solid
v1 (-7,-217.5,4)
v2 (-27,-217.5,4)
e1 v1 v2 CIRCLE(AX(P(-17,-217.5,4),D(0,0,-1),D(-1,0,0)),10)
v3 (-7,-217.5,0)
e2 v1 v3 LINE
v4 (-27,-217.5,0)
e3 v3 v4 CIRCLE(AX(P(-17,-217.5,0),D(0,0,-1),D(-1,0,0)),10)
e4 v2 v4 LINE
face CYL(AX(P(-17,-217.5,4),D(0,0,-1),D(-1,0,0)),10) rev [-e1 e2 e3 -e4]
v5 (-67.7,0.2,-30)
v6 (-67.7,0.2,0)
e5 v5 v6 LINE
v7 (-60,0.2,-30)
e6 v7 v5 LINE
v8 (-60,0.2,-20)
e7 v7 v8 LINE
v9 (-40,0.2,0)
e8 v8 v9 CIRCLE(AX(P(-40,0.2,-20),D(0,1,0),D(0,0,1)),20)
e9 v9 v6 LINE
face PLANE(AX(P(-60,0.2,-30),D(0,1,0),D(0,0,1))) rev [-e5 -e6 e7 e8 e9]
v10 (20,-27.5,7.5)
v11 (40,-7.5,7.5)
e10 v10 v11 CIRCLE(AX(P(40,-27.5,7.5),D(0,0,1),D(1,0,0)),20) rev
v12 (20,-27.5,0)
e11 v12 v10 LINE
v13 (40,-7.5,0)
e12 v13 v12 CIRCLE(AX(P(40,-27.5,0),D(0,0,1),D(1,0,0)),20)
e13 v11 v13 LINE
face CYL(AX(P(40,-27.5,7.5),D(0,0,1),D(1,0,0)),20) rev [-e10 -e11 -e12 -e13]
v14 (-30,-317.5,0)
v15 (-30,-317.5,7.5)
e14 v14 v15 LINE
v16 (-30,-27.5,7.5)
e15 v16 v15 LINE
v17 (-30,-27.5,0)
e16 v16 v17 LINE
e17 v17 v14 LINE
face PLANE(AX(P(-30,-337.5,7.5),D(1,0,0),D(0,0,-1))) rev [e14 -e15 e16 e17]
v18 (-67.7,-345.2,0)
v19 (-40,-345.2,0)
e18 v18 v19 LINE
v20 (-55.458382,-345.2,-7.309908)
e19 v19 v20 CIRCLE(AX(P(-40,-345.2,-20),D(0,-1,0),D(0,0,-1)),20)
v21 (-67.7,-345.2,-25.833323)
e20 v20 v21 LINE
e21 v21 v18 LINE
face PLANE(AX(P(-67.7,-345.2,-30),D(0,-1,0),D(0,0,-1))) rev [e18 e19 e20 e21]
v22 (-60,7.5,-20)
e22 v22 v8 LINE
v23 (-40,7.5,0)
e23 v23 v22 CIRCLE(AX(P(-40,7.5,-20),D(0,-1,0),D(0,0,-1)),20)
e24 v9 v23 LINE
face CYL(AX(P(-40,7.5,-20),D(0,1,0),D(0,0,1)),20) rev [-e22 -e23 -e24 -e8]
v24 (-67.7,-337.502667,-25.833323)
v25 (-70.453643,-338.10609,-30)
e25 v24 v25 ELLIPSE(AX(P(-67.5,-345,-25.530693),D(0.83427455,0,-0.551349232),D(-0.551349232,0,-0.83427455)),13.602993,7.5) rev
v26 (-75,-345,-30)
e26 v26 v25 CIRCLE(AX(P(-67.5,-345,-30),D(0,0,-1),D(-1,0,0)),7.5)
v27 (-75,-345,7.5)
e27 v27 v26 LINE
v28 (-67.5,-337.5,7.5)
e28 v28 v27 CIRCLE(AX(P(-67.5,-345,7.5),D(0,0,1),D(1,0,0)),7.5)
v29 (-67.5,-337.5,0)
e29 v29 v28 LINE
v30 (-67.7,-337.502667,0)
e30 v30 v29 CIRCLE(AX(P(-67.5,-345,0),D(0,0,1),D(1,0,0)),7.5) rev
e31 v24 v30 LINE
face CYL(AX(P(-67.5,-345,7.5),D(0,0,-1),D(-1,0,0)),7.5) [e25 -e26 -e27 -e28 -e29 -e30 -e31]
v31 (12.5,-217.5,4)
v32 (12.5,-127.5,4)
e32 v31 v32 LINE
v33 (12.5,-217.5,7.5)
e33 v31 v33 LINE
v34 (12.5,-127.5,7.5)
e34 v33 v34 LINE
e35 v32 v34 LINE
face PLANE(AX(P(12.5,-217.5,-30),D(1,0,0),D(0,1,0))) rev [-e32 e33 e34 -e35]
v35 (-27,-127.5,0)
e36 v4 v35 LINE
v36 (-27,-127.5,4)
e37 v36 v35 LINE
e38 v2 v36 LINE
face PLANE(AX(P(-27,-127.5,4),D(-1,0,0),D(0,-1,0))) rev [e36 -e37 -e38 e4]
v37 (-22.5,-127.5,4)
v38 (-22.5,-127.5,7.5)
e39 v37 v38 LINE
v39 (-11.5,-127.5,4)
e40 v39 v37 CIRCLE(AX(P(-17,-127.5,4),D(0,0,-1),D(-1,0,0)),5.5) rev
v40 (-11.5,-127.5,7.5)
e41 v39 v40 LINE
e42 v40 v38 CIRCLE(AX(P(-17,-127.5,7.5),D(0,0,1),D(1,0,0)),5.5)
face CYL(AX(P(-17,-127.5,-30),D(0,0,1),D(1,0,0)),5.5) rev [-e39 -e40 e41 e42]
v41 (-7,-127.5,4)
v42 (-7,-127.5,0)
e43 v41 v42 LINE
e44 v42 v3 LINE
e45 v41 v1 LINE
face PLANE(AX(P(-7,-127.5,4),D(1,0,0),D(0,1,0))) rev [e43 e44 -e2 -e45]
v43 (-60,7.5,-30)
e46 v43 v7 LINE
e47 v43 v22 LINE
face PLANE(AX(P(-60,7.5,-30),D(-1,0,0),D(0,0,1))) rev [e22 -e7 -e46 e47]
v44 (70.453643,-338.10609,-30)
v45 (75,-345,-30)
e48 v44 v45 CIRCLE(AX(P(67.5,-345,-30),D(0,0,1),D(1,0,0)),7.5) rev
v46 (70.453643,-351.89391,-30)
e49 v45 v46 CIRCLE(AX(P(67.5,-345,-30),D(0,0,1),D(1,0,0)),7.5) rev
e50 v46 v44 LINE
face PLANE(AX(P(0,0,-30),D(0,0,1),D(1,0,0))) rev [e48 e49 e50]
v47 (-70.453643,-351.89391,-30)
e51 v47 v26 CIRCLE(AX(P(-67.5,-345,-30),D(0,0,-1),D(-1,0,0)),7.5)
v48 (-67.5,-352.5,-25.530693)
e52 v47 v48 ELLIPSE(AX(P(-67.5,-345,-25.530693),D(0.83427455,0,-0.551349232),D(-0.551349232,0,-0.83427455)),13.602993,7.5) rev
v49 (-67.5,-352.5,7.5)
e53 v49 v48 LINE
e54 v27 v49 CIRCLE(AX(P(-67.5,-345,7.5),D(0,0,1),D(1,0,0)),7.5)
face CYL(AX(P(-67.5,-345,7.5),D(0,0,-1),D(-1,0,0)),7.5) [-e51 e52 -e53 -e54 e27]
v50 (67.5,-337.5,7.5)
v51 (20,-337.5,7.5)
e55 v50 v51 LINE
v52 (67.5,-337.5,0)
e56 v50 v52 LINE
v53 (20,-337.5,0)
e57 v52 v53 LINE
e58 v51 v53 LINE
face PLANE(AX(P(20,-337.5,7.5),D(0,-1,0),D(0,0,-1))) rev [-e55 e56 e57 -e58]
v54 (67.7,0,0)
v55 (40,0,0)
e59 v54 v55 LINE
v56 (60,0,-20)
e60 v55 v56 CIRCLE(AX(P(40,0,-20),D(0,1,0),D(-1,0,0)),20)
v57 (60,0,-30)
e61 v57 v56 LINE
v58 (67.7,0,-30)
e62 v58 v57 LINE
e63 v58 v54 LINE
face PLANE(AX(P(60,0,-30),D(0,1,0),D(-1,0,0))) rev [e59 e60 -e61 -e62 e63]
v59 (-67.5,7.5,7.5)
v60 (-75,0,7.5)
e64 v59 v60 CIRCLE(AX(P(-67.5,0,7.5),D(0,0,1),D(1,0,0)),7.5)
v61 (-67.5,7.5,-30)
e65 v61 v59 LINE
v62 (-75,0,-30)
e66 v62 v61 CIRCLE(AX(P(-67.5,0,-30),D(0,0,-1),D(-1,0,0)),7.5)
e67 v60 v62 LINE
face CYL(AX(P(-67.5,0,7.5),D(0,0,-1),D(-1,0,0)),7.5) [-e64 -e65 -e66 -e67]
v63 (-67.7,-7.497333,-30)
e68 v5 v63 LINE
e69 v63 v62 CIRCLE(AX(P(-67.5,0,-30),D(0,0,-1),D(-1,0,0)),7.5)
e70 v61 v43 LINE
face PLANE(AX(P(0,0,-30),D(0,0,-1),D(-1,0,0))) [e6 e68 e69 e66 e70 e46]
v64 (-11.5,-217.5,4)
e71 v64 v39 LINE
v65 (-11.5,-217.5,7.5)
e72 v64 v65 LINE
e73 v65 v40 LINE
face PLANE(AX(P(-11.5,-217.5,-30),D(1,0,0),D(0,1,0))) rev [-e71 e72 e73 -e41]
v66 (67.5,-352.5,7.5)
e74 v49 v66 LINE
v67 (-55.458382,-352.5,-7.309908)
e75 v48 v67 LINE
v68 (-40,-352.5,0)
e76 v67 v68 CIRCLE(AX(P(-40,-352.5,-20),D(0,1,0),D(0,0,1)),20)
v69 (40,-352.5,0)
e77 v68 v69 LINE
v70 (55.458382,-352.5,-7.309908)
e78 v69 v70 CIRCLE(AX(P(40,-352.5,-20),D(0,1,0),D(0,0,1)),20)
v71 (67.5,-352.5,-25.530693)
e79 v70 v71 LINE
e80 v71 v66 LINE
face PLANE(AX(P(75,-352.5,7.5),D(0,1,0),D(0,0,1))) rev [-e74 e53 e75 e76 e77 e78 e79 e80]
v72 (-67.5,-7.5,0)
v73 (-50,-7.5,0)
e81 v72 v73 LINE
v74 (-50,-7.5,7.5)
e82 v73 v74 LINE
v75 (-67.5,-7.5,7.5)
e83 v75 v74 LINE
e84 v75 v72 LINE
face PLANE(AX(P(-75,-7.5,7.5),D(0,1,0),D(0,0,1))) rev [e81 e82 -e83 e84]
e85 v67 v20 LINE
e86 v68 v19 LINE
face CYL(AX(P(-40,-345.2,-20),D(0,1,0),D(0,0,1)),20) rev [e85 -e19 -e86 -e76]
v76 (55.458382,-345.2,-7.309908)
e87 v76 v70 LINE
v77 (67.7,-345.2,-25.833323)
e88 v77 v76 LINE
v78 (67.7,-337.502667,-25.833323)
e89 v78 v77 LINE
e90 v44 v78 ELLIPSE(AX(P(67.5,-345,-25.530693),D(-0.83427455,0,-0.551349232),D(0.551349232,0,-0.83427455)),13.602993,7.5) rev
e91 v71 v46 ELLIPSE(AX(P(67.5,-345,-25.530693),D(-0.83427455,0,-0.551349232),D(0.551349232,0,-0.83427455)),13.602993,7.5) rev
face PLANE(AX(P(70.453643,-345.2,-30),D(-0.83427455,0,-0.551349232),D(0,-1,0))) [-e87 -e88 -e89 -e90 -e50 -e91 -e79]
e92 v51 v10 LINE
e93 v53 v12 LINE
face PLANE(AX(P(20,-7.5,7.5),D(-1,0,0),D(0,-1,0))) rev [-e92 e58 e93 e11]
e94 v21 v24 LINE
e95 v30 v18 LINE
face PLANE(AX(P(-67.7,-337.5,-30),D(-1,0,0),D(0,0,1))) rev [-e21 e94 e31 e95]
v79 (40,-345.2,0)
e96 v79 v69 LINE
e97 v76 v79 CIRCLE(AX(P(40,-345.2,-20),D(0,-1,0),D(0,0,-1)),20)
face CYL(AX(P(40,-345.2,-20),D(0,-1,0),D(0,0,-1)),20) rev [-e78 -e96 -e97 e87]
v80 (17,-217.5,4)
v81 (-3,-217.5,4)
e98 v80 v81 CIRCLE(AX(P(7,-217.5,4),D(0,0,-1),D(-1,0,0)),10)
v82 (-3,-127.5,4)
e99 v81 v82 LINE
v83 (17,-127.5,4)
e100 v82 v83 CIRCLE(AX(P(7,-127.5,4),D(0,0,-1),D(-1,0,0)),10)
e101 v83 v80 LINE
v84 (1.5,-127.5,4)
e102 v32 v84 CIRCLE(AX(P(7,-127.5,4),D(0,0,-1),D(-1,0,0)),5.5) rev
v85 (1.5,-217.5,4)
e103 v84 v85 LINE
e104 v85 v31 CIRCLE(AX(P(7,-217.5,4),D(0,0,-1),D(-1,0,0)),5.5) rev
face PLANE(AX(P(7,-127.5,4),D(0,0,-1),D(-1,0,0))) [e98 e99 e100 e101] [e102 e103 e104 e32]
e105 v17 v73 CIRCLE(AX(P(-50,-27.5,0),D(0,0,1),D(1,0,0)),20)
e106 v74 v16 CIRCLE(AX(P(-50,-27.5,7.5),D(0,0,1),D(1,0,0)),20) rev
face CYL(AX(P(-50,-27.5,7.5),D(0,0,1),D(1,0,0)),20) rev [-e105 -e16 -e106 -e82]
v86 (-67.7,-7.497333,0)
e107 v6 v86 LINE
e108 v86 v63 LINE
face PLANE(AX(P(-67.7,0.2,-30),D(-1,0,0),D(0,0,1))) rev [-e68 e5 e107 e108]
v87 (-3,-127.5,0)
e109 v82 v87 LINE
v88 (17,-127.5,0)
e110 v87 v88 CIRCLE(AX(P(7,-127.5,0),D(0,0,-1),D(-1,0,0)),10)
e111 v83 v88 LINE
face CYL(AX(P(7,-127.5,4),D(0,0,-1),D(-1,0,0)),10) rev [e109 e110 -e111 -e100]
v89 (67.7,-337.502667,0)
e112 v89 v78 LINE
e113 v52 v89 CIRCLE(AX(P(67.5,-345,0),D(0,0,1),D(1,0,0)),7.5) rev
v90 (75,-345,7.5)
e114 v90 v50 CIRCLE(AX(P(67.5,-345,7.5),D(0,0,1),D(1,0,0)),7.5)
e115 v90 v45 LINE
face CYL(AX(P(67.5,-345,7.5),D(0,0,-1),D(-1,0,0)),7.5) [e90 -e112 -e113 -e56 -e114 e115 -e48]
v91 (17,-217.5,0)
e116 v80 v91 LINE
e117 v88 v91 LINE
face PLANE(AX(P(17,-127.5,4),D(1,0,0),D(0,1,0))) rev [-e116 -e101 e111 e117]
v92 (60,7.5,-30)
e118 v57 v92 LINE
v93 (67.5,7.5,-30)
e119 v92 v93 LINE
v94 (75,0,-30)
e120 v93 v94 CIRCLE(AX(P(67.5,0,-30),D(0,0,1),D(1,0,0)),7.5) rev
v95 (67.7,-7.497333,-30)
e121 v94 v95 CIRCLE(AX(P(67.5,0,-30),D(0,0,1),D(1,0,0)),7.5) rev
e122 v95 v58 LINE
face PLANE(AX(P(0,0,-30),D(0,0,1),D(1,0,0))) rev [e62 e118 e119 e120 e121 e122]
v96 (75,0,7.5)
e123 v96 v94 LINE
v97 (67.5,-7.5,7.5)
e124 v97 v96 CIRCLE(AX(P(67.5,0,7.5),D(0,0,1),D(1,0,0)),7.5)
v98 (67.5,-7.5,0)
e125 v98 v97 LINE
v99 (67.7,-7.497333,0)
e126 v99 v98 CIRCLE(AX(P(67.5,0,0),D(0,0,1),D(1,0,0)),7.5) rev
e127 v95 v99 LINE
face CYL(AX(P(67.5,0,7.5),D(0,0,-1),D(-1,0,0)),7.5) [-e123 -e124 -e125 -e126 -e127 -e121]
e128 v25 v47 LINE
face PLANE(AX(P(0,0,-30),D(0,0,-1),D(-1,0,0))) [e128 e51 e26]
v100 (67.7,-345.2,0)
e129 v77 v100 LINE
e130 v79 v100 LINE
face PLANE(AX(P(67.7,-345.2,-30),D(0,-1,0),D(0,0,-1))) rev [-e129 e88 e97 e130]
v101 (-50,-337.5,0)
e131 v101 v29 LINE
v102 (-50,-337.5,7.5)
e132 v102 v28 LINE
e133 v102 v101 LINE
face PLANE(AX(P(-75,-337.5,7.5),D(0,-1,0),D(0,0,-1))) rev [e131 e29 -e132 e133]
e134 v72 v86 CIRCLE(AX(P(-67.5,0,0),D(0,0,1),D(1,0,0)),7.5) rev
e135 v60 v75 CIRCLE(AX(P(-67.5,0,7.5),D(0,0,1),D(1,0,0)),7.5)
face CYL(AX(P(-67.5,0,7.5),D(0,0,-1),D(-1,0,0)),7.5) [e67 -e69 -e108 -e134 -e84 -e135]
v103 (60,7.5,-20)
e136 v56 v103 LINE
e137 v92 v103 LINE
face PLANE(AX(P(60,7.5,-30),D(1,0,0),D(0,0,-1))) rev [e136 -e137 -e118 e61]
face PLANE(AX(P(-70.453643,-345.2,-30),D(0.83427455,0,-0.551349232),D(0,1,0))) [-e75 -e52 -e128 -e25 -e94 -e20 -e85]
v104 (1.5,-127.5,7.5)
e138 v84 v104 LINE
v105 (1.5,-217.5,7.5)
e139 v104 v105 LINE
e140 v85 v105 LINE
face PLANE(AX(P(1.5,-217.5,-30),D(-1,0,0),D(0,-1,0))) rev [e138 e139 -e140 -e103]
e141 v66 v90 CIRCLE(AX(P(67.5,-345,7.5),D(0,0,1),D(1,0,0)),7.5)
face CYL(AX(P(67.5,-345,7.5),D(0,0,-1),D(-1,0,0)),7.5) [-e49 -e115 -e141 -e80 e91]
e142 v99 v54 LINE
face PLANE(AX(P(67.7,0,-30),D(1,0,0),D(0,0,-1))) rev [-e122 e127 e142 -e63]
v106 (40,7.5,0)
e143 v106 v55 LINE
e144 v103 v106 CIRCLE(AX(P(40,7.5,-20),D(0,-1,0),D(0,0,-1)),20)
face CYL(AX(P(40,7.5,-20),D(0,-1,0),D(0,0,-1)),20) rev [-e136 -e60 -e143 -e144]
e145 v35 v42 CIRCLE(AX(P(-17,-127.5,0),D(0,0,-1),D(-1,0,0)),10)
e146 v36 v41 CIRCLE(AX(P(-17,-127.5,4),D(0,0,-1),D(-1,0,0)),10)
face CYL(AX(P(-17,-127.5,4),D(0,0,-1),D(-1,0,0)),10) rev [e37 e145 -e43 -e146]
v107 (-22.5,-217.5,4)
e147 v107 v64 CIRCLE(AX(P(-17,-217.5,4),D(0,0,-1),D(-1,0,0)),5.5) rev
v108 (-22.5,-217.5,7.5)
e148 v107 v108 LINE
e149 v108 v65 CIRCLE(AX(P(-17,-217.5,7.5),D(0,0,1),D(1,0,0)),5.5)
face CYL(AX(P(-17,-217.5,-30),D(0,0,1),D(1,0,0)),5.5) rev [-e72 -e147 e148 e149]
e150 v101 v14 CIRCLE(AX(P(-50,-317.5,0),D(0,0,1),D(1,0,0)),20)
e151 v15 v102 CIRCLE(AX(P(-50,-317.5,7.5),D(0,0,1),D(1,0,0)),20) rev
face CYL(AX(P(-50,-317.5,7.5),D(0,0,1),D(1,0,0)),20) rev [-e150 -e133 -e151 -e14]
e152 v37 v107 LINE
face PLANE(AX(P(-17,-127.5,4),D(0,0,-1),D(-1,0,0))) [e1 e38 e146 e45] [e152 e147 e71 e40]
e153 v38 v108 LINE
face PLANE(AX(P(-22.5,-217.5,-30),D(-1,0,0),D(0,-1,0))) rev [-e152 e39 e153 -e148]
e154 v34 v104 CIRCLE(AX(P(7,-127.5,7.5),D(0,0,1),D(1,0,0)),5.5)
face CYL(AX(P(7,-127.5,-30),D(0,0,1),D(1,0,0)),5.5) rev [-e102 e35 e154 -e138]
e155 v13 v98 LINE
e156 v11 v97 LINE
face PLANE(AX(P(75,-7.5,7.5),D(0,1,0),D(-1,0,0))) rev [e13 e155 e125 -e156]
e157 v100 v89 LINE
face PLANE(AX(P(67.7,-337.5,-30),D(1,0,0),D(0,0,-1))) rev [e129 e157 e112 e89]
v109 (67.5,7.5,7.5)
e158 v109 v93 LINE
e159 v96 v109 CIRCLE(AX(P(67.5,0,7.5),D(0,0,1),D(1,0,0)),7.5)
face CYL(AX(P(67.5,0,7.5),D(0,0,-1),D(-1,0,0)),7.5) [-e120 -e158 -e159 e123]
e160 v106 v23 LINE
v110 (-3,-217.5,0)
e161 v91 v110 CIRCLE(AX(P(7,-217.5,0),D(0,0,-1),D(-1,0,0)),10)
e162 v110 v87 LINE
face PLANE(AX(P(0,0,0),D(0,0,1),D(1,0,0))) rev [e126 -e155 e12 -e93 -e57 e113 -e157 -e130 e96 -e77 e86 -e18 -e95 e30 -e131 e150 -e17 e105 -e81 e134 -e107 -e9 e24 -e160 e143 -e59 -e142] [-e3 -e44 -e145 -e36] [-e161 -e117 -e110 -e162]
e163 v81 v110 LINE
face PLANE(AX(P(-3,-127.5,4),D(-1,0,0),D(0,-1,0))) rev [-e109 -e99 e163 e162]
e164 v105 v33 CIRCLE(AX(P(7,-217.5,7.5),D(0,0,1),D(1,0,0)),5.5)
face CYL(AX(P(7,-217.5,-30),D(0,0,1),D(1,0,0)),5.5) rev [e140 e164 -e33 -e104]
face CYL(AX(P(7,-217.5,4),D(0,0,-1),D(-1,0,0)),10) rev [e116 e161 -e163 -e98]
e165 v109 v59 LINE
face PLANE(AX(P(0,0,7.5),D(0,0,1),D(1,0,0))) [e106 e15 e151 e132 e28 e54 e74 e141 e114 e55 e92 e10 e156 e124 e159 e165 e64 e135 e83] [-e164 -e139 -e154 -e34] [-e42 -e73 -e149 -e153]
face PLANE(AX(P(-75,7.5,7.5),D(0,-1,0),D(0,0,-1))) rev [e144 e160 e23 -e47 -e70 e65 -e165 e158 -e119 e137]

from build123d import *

# Parameters (mm, degrees)
BOSS_EXTRUDE1_DEPTH = 7.5
BOSS_EXTRUDE2_DEPTH = 30
FILLET1_R           = 20
FILLET2_R           = 20
FILLET4_R           = 7.5
CUT_EXTRUDE1_DEPTH  = 363.336169875
CUT_EXTRUDE2_DEPTH  = 4
CHAMFER1_START      = -352.5
CHAMFER1_DEPTH      = 15.5
CHAMFER1_2_DEPTH    = 7.3


with BuildPart() as part:
    # Sketch1 → Boss-Extrude1 (new body)
    with BuildSketch(Plane.XY):
        Polygon((-75, -337.5), (-30, -337.5), (-30, -7.5), (-75, -7.5), (-75, 7.5), (75, 7.5), (75, -7.5), (20, -7.5), (20, -337.5), (75, -337.5), (75, -352.5), (-75, -352.5), align=None)
    extrude(amount=BOSS_EXTRUDE1_DEPTH)

    # Sketch2 → Boss-Extrude2 (add)
    with BuildSketch(Plane(origin=(0, 0, 0), x_dir=(-1, 0, 0), z_dir=(0, 0, -1))):
        Polygon((67.7, -337.5), (67.7, -345.2), (60, -345.2), (60, -352.5), (75, -352.5), (75, -337.5), align=None)
        Polygon((-67.7, -337.5), (-67.7, -345.2), (-60, -345.2), (-60, -352.5), (-75, -352.5), (-75, -337.5), align=None)
        Polygon((-67.7, -7.5), (-75, -7.5), (-75, 7.5), (-60, 7.5), (-60, 0), (-67.7, 0), align=None)
        Polygon((67.7, -7.5), (75, -7.5), (75, 7.5), (60, 7.5), (60, 0.2), (67.7, 0.2), align=None)
    extrude(amount=BOSS_EXTRUDE2_DEPTH)

    # Fillet1
    fillet1_edges = [part.edges().sort_by_distance(p)[0] for p in [
        (-60, -348.85, 0),
        (60, -348.85, 0),
        (60, 3.75, 0),
        (-60, 3.85, 0),
    ]]
    fillet(fillet1_edges, radius=FILLET1_R)

    # Fillet2
    fillet2_edges = [part.edges().sort_by_distance(p)[0] for p in [
        (20, -7.5, 3.75),
        (-30, -337.5, 3.75),
        (-30, -7.5, 3.75),
    ]]
    fillet(fillet2_edges, radius=FILLET2_R)

    # Fillet4
    fillet4_edges = [part.edges().sort_by_distance(p)[0] for p in [
        (-75, -352.5, -11.25),
        (-75, -337.5, -11.25),
        (-75, -7.5, -11.25),
        (-75, 7.5, -11.25),
        (75, 7.5, -11.25),
        (75, -7.5, -11.25),
        (75, -337.5, -11.25),
        (75, -352.5, -11.25),
    ]]
    fillet(fillet4_edges, radius=FILLET4_R - 0.0001)  # a hair under: the kernel refuses the full size

    # Sketch3 → Cut-Extrude1 (cut, through all)
    with BuildSketch(Plane.XY.offset(7.5)):
        with BuildLine():
            Line((-22.5, -217.5), (-22.5, -127.5))
            ThreePointArc((-22.5, -127.5), (-17, -122), (-11.5, -127.5))
            Line((-11.5, -127.5), (-11.5, -217.5))
            ThreePointArc((-11.5, -217.5), (-17, -223), (-22.5, -217.5))
        make_face()
        with BuildLine():
            Line((1.5, -217.5), (1.5, -127.5))
            ThreePointArc((1.5, -127.5), (7, -122), (12.5, -127.5))
            Line((12.5, -127.5), (12.5, -217.5))
            ThreePointArc((12.5, -217.5), (7, -223), (1.5, -217.5))
        make_face()
    extrude(amount=-CUT_EXTRUDE1_DEPTH, mode=Mode.SUBTRACT)

    # Sketch4 → Cut-Extrude2 (cut)
    with BuildSketch(Plane(origin=(0, 0, 0), x_dir=(-1, 0, 0), z_dir=(0, 0, -1))):
        with BuildLine():
            Line((27, -127.5), (27, -217.5))
            ThreePointArc((27, -217.5), (17, -227.5), (7, -217.5))
            Line((7, -217.5), (7, -127.5))
            ThreePointArc((7, -127.5), (17, -117.5), (27, -127.5))
        make_face()
        with BuildLine():
            Line((3, -127.5), (3, -217.5))
            ThreePointArc((3, -217.5), (-7, -227.5), (-17, -217.5))
            Line((-17, -217.5), (-17, -127.5))
            ThreePointArc((-17, -127.5), (-7, -117.5), (3, -127.5))
        make_face()
    extrude(amount=-CUT_EXTRUDE2_DEPTH, mode=Mode.SUBTRACT)

    # Chamfer1: read off the stored shape, not the designer's step
    # Chamfer1 outline → Chamfer1 (cut)
    with BuildSketch(Plane(origin=(0, 0, 0), x_dir=(1, 0, 0), z_dir=(0, 1, 0)).offset(CHAMFER1_START)):
        with BuildLine():
            Line((70.453642879, 30), (60, 30))
            Line((60, 30), (60, 20))
            ThreePointArc((60, 20), (59.425347085, 15.240179557), (57.734410936, 10.753883584))
            Line((57.734410936, 10.753883584), (70.453642879, 30))
        make_face()
        with BuildLine():
            ThreePointArc((-57.734410936, 10.753883584), (-59.425347085, 15.240179557), (-60, 20))
            Line((-60, 20), (-60, 30))
            Line((-60, 30), (-70.453642879, 30))
            Line((-70.453642879, 30), (-57.734410936, 10.753883584))
        make_face()
    extrude(amount=CHAMFER1_DEPTH, mode=Mode.SUBTRACT)

    # Chamfer1 2 outline → Chamfer1 2 (add)
    with BuildSketch(Plane(origin=(0, 0, 0), x_dir=(1, 0, 0), z_dir=(0, 1, 0)).offset(CHAMFER1_START)):
        with BuildLine():
            ThreePointArc((55.458381501, 7.309907748), (56.685490998, 8.973015363), (57.734410936, 10.753883584))
            Line((57.734410936, 10.753883584), (55.458381501, 7.309907748))
        make_face()
        with BuildLine():
            ThreePointArc((-57.734410936, 10.753883584), (-56.685490998, 8.973015363), (-55.458381501, 7.309907748))
            Line((-55.458381501, 7.309907748), (-57.734410936, 10.753883584))
        make_face()
    extrude(amount=CHAMFER1_2_DEPTH)


solid = part.part
